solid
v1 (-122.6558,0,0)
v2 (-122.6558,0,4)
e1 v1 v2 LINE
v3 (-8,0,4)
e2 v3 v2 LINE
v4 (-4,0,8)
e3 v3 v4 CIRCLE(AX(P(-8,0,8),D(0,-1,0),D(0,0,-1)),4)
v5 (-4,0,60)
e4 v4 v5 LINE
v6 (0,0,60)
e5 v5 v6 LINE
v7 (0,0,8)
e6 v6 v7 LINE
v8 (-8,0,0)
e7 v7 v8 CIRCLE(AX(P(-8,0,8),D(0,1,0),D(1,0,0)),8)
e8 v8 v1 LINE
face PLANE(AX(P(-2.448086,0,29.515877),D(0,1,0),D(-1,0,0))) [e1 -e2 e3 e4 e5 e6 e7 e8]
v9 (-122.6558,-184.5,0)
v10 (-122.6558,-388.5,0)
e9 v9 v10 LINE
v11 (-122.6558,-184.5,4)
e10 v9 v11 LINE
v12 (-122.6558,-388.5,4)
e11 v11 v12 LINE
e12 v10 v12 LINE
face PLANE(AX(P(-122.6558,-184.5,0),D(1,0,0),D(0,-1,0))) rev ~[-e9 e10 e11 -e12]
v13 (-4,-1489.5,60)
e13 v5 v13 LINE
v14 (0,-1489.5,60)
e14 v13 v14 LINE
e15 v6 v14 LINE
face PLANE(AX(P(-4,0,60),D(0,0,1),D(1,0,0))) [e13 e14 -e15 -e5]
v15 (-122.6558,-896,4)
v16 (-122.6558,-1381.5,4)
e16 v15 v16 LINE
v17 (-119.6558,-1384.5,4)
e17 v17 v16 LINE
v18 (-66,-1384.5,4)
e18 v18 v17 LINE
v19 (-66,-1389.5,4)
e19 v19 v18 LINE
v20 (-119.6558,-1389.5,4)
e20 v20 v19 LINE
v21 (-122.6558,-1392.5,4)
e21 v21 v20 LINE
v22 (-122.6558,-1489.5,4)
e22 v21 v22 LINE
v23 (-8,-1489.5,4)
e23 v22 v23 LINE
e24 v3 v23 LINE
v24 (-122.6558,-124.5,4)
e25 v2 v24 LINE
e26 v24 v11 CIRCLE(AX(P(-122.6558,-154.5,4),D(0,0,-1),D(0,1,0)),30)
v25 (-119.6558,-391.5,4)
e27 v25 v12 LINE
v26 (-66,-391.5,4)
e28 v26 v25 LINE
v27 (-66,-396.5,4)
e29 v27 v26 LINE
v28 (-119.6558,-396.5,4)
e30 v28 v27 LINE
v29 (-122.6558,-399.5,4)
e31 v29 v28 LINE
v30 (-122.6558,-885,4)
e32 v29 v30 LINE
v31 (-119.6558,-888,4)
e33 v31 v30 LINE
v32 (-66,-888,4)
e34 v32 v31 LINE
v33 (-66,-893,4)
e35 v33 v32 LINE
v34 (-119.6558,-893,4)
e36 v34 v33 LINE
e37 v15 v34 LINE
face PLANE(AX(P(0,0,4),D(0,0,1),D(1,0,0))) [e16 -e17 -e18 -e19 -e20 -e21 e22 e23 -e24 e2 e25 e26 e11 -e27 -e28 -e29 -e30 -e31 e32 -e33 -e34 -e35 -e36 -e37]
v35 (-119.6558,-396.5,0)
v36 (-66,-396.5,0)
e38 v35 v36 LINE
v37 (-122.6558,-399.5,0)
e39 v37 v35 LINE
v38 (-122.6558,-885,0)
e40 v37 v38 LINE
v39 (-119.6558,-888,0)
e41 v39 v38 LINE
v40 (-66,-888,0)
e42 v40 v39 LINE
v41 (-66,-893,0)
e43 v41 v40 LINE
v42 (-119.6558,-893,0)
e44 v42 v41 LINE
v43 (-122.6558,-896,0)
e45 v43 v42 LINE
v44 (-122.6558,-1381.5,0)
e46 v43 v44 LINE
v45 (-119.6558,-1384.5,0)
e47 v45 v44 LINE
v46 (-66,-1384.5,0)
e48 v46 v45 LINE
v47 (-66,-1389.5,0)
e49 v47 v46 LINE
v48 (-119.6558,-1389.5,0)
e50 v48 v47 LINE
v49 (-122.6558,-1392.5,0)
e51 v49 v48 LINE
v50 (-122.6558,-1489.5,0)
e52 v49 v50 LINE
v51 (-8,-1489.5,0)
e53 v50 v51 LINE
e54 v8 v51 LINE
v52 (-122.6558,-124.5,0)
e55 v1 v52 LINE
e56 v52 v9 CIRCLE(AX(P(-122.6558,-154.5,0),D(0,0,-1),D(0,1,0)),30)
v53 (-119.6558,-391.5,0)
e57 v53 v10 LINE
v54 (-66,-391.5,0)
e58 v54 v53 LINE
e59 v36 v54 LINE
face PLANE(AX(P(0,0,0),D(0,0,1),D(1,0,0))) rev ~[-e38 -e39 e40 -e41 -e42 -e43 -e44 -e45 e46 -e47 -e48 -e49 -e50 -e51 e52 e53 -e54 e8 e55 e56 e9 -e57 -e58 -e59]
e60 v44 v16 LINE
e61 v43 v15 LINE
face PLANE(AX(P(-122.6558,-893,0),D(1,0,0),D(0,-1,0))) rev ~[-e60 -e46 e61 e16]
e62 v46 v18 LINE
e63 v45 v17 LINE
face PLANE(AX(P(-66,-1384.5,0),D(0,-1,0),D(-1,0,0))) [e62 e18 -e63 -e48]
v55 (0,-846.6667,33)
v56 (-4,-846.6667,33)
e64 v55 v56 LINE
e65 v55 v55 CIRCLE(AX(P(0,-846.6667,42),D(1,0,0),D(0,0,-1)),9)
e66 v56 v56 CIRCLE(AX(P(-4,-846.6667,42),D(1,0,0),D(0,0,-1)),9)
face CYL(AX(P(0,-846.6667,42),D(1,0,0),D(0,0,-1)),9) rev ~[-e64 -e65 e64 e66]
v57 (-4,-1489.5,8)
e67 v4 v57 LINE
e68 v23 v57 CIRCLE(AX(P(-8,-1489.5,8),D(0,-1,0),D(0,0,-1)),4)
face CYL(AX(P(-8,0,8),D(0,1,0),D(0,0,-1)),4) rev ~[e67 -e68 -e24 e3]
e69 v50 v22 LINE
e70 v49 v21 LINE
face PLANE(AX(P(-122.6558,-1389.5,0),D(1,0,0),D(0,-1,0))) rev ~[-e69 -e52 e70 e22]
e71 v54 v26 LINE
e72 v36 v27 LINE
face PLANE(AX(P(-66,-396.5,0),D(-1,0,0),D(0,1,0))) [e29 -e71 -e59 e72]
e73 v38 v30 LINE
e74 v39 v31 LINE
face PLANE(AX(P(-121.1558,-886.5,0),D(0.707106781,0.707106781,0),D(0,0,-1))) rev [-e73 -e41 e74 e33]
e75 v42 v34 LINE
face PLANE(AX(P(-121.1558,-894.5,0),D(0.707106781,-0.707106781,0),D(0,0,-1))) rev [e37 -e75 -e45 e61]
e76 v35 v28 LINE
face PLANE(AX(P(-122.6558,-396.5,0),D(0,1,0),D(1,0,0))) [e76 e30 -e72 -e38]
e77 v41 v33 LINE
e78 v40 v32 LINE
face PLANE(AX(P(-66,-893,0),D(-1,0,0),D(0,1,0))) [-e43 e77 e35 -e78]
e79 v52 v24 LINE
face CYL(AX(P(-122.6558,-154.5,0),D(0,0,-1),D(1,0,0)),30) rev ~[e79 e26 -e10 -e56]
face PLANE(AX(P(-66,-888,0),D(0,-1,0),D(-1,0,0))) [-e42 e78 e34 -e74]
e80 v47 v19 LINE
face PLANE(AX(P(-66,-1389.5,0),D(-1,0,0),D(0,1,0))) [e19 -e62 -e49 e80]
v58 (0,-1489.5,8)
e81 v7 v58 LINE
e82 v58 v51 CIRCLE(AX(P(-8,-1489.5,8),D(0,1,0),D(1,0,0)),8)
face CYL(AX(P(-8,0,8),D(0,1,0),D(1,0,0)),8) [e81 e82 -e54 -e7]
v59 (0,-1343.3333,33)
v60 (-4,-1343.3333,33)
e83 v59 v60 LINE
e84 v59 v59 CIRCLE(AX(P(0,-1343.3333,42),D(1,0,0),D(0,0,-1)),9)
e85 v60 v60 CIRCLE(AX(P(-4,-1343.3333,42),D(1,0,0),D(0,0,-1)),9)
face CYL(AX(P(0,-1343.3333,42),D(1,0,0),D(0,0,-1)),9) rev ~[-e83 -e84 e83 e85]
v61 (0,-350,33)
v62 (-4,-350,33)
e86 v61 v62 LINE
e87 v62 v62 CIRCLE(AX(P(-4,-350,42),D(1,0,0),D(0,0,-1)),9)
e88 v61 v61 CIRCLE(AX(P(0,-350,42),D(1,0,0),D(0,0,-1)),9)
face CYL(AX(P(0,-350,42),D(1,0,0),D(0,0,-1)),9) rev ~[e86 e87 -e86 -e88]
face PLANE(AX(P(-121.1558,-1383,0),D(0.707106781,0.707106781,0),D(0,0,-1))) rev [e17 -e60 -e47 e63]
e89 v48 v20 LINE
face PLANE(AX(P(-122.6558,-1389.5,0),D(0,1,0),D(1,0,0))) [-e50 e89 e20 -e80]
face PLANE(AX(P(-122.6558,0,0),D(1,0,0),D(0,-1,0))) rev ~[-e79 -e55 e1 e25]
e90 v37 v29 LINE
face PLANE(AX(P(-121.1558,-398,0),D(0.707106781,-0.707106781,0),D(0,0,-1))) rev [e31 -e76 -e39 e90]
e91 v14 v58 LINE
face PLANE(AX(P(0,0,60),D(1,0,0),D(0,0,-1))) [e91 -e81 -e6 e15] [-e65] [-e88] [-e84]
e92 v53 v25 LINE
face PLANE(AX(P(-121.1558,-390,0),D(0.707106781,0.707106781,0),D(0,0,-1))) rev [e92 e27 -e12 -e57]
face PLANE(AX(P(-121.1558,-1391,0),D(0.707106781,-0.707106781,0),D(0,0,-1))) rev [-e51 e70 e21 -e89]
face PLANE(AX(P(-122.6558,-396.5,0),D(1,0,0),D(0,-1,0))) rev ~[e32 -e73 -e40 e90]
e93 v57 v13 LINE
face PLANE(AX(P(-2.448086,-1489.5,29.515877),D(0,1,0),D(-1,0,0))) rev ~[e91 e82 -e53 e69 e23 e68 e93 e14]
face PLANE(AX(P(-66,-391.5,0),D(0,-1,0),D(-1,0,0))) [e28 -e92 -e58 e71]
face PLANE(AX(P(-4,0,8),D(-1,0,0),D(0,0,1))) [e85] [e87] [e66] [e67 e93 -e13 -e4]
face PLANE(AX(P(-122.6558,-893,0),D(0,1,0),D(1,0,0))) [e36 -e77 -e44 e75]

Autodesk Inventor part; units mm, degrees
ref_plane "YZ Plane" through (0, 0, 0) normal (1, 0, 0) x (0, 1, 0)
ref_plane "XZ Plane" through (0, 0, 0) normal (0, 1, 0) x (-1, 0, 0)
ref_plane "XY Plane" through (0, 0, 0) normal (0, 0, 1) x (1, 0, 0)
sketch "Sketch1" plane through (0, 0, 0) normal (0, 0, 1) x (1, 0, 0)
  line L0 (0, 0) -> (-122.6558, 0)
  line L1 (-122.6558, 0) -> (-122.6558, -1489.5)
  line L2 (-122.6558, -1489.5) -> (0, -1489.5)
  line L3 (0, -1489.5) -> (0, 0)
  line L4 (-122.6558, -1389.5) -> (-66, -1389.5)
  line L5 (-66, -1389.5) -> (-66, -1384.5)
  line L6 (-66, -1384.5) -> (-122.6558, -1384.5)
  line L7 (-122.6558, -1384.5) -> (-122.6558, -1389.5)
  line L8 (-122.6558, -893) -> (-66, -893)
  line L9 (-66, -893) -> (-66, -888)
  line L10 (-66, -888) -> (-122.6558, -888)
  line L11 (-122.6558, -888) -> (-122.6558, -893)
  line L12 (-122.6558, -396.5) -> (-66, -396.5)
  line L13 (-66, -396.5) -> (-66, -391.5)
  line L14 (-66, -391.5) -> (-122.6558, -391.5)
  line L15 (-122.6558, -391.5) -> (-122.6558, -396.5)
  circle A0 centre (-122.6558, -154.5) radius 30
  point P0 (-122.6558, -391.5)
  point P1 (-122.6558, -124.5)
  point P2 (-122.6558, -184.5)
  dimension "d0" = 1489.5
  dimension "d1" = 122.6559
  dimension "d2" = 5
  dimension "d4" = 100
  dimension "d7" = 496.5
  dimension "d23" = 66
  dimension "d28" = 60
  dimension "d29" = 1335
extrude "Plate1" add sketch "Sketch1" along normal blind 4 contours L3 L2 L1 L4 L5 L6 L8 L9 L10 L12 L13 L14 A0 L0
sketch "Sketch2" plane through (-4, 0, 0) normal (1, 0, 0) x (0, 1, 0)
  line L0 (-1489.5, 0) -> (0, 0)
  line L1 (0, 0) -> (0, 60)
  line L2 (0, 60) -> (-1489.5, 60)
  line L3 (-1489.5, 60) -> (-1489.5, 0)
edge flange "Flange1" height 60 angle 90 thickness 4 bend radius 4 thickness toward (1, 0, 0) relief tear relief width 4 relief depth 2 edges at (0, -744.75, 4) wall of the first edge with corners at (-4, -1489.5, 0) (-4, 0, 0) (-4, 0, 60) (-4, -1489.5, 60)
bend "Bend1"
corner "Corner1"
chamfer "Corner Chamfer1" distance 3 angle 45 6 edges at (-122.6558, -1389.5, 2) (-122.6558, -1384.5, 2) (-122.6558, -893, 2) (-122.6558, -888, 2) (-122.6558, -391.5, 2) (-122.6558, -396.5, 2)
sketch "Sketch4" plane through (0, -1489.5, 60) normal (1, 0, 0) x (0, 0, -1)
  circle A0 centre (18, 1139.5) radius 9
  line L0 (0, 0) -> (0, 1489.5) projected
  circle A1 centre (18, 642.8333) radius 9
  circle A2 centre (18, 146.1667) radius 9
  point P0 (60, 1489.5)
  dimension "d30" = 18
  dimension "d31" = 18
  dimension "d32" = 350
  dimension "d35" = 496.6667
extrude "Cut1" cut sketch "Sketch4" against normal blind 4
equation "\"d0\" = Стрингер_длина"
equation "\"d1\" = стрингер_глубина_7"
equation "\"d2\" = паз_под_стрингер_толщина"
equation "\"d7\" = 0.333333 * Стрингер_длина"
equation "\"d23\" = паз_под_стрингер_глубина - Thickness"
equation "\"d28\" = 2 * радиус_выреза_под_сварку"
equation "\"d35\" = Шаг_шпангоутов"
equation "\"d40\" = Thickness"
equation "\"d12\" = Thickness"
equation "\"d13\" = BendReliefWidth"
equation "\"d14\" = BendReliefDepth"
equation "\"d15\" = MinimumRemnant"
equation "\"d16\" = TransitionRadius"
equation "\"d17\" = ребро_усилителей"
equation "\"d19\" = BendRadius"
equation "\"d20\" = CornerReliefSize"
equation "\"d21\" = GapSize"
equation "\"d22\" = JacobiRadiusSize"
equation "\"BendRadius\" = Thickness"
equation "\"BendReliefWidth\" = Thickness"
equation "\"BendReliefDepth\" = 0.5 * Thickness"
equation "\"CornerReliefSize\" = 4 * Thickness"
equation "\"MinimumRemnant\" = 2 * Thickness"
equation "\"TransitionRadius\" = BendRadius"
equation "\"JacobiRadiusSize\" = BendRadius"
equation "\"GapSize\" = Thickness"
equation "\"Стрингер_длина\" = 1489.5"
equation "\"стрингер_глубина_7\" = 122.65585"
equation "\"паз_под_стрингер_толщина\" = 5"
equation "\"паз_под_стрингер_глубина\" = 70"
equation "\"Thickness\" = 4"
equation "\"радиус_выреза_под_сварку\" = 30"
equation "\"Шаг_шпангоутов\" = 496.666667"
equation "\"ребро_усилителей\" = 60"
properties part number "GBK 0302 stringer 7" material "Steel"
